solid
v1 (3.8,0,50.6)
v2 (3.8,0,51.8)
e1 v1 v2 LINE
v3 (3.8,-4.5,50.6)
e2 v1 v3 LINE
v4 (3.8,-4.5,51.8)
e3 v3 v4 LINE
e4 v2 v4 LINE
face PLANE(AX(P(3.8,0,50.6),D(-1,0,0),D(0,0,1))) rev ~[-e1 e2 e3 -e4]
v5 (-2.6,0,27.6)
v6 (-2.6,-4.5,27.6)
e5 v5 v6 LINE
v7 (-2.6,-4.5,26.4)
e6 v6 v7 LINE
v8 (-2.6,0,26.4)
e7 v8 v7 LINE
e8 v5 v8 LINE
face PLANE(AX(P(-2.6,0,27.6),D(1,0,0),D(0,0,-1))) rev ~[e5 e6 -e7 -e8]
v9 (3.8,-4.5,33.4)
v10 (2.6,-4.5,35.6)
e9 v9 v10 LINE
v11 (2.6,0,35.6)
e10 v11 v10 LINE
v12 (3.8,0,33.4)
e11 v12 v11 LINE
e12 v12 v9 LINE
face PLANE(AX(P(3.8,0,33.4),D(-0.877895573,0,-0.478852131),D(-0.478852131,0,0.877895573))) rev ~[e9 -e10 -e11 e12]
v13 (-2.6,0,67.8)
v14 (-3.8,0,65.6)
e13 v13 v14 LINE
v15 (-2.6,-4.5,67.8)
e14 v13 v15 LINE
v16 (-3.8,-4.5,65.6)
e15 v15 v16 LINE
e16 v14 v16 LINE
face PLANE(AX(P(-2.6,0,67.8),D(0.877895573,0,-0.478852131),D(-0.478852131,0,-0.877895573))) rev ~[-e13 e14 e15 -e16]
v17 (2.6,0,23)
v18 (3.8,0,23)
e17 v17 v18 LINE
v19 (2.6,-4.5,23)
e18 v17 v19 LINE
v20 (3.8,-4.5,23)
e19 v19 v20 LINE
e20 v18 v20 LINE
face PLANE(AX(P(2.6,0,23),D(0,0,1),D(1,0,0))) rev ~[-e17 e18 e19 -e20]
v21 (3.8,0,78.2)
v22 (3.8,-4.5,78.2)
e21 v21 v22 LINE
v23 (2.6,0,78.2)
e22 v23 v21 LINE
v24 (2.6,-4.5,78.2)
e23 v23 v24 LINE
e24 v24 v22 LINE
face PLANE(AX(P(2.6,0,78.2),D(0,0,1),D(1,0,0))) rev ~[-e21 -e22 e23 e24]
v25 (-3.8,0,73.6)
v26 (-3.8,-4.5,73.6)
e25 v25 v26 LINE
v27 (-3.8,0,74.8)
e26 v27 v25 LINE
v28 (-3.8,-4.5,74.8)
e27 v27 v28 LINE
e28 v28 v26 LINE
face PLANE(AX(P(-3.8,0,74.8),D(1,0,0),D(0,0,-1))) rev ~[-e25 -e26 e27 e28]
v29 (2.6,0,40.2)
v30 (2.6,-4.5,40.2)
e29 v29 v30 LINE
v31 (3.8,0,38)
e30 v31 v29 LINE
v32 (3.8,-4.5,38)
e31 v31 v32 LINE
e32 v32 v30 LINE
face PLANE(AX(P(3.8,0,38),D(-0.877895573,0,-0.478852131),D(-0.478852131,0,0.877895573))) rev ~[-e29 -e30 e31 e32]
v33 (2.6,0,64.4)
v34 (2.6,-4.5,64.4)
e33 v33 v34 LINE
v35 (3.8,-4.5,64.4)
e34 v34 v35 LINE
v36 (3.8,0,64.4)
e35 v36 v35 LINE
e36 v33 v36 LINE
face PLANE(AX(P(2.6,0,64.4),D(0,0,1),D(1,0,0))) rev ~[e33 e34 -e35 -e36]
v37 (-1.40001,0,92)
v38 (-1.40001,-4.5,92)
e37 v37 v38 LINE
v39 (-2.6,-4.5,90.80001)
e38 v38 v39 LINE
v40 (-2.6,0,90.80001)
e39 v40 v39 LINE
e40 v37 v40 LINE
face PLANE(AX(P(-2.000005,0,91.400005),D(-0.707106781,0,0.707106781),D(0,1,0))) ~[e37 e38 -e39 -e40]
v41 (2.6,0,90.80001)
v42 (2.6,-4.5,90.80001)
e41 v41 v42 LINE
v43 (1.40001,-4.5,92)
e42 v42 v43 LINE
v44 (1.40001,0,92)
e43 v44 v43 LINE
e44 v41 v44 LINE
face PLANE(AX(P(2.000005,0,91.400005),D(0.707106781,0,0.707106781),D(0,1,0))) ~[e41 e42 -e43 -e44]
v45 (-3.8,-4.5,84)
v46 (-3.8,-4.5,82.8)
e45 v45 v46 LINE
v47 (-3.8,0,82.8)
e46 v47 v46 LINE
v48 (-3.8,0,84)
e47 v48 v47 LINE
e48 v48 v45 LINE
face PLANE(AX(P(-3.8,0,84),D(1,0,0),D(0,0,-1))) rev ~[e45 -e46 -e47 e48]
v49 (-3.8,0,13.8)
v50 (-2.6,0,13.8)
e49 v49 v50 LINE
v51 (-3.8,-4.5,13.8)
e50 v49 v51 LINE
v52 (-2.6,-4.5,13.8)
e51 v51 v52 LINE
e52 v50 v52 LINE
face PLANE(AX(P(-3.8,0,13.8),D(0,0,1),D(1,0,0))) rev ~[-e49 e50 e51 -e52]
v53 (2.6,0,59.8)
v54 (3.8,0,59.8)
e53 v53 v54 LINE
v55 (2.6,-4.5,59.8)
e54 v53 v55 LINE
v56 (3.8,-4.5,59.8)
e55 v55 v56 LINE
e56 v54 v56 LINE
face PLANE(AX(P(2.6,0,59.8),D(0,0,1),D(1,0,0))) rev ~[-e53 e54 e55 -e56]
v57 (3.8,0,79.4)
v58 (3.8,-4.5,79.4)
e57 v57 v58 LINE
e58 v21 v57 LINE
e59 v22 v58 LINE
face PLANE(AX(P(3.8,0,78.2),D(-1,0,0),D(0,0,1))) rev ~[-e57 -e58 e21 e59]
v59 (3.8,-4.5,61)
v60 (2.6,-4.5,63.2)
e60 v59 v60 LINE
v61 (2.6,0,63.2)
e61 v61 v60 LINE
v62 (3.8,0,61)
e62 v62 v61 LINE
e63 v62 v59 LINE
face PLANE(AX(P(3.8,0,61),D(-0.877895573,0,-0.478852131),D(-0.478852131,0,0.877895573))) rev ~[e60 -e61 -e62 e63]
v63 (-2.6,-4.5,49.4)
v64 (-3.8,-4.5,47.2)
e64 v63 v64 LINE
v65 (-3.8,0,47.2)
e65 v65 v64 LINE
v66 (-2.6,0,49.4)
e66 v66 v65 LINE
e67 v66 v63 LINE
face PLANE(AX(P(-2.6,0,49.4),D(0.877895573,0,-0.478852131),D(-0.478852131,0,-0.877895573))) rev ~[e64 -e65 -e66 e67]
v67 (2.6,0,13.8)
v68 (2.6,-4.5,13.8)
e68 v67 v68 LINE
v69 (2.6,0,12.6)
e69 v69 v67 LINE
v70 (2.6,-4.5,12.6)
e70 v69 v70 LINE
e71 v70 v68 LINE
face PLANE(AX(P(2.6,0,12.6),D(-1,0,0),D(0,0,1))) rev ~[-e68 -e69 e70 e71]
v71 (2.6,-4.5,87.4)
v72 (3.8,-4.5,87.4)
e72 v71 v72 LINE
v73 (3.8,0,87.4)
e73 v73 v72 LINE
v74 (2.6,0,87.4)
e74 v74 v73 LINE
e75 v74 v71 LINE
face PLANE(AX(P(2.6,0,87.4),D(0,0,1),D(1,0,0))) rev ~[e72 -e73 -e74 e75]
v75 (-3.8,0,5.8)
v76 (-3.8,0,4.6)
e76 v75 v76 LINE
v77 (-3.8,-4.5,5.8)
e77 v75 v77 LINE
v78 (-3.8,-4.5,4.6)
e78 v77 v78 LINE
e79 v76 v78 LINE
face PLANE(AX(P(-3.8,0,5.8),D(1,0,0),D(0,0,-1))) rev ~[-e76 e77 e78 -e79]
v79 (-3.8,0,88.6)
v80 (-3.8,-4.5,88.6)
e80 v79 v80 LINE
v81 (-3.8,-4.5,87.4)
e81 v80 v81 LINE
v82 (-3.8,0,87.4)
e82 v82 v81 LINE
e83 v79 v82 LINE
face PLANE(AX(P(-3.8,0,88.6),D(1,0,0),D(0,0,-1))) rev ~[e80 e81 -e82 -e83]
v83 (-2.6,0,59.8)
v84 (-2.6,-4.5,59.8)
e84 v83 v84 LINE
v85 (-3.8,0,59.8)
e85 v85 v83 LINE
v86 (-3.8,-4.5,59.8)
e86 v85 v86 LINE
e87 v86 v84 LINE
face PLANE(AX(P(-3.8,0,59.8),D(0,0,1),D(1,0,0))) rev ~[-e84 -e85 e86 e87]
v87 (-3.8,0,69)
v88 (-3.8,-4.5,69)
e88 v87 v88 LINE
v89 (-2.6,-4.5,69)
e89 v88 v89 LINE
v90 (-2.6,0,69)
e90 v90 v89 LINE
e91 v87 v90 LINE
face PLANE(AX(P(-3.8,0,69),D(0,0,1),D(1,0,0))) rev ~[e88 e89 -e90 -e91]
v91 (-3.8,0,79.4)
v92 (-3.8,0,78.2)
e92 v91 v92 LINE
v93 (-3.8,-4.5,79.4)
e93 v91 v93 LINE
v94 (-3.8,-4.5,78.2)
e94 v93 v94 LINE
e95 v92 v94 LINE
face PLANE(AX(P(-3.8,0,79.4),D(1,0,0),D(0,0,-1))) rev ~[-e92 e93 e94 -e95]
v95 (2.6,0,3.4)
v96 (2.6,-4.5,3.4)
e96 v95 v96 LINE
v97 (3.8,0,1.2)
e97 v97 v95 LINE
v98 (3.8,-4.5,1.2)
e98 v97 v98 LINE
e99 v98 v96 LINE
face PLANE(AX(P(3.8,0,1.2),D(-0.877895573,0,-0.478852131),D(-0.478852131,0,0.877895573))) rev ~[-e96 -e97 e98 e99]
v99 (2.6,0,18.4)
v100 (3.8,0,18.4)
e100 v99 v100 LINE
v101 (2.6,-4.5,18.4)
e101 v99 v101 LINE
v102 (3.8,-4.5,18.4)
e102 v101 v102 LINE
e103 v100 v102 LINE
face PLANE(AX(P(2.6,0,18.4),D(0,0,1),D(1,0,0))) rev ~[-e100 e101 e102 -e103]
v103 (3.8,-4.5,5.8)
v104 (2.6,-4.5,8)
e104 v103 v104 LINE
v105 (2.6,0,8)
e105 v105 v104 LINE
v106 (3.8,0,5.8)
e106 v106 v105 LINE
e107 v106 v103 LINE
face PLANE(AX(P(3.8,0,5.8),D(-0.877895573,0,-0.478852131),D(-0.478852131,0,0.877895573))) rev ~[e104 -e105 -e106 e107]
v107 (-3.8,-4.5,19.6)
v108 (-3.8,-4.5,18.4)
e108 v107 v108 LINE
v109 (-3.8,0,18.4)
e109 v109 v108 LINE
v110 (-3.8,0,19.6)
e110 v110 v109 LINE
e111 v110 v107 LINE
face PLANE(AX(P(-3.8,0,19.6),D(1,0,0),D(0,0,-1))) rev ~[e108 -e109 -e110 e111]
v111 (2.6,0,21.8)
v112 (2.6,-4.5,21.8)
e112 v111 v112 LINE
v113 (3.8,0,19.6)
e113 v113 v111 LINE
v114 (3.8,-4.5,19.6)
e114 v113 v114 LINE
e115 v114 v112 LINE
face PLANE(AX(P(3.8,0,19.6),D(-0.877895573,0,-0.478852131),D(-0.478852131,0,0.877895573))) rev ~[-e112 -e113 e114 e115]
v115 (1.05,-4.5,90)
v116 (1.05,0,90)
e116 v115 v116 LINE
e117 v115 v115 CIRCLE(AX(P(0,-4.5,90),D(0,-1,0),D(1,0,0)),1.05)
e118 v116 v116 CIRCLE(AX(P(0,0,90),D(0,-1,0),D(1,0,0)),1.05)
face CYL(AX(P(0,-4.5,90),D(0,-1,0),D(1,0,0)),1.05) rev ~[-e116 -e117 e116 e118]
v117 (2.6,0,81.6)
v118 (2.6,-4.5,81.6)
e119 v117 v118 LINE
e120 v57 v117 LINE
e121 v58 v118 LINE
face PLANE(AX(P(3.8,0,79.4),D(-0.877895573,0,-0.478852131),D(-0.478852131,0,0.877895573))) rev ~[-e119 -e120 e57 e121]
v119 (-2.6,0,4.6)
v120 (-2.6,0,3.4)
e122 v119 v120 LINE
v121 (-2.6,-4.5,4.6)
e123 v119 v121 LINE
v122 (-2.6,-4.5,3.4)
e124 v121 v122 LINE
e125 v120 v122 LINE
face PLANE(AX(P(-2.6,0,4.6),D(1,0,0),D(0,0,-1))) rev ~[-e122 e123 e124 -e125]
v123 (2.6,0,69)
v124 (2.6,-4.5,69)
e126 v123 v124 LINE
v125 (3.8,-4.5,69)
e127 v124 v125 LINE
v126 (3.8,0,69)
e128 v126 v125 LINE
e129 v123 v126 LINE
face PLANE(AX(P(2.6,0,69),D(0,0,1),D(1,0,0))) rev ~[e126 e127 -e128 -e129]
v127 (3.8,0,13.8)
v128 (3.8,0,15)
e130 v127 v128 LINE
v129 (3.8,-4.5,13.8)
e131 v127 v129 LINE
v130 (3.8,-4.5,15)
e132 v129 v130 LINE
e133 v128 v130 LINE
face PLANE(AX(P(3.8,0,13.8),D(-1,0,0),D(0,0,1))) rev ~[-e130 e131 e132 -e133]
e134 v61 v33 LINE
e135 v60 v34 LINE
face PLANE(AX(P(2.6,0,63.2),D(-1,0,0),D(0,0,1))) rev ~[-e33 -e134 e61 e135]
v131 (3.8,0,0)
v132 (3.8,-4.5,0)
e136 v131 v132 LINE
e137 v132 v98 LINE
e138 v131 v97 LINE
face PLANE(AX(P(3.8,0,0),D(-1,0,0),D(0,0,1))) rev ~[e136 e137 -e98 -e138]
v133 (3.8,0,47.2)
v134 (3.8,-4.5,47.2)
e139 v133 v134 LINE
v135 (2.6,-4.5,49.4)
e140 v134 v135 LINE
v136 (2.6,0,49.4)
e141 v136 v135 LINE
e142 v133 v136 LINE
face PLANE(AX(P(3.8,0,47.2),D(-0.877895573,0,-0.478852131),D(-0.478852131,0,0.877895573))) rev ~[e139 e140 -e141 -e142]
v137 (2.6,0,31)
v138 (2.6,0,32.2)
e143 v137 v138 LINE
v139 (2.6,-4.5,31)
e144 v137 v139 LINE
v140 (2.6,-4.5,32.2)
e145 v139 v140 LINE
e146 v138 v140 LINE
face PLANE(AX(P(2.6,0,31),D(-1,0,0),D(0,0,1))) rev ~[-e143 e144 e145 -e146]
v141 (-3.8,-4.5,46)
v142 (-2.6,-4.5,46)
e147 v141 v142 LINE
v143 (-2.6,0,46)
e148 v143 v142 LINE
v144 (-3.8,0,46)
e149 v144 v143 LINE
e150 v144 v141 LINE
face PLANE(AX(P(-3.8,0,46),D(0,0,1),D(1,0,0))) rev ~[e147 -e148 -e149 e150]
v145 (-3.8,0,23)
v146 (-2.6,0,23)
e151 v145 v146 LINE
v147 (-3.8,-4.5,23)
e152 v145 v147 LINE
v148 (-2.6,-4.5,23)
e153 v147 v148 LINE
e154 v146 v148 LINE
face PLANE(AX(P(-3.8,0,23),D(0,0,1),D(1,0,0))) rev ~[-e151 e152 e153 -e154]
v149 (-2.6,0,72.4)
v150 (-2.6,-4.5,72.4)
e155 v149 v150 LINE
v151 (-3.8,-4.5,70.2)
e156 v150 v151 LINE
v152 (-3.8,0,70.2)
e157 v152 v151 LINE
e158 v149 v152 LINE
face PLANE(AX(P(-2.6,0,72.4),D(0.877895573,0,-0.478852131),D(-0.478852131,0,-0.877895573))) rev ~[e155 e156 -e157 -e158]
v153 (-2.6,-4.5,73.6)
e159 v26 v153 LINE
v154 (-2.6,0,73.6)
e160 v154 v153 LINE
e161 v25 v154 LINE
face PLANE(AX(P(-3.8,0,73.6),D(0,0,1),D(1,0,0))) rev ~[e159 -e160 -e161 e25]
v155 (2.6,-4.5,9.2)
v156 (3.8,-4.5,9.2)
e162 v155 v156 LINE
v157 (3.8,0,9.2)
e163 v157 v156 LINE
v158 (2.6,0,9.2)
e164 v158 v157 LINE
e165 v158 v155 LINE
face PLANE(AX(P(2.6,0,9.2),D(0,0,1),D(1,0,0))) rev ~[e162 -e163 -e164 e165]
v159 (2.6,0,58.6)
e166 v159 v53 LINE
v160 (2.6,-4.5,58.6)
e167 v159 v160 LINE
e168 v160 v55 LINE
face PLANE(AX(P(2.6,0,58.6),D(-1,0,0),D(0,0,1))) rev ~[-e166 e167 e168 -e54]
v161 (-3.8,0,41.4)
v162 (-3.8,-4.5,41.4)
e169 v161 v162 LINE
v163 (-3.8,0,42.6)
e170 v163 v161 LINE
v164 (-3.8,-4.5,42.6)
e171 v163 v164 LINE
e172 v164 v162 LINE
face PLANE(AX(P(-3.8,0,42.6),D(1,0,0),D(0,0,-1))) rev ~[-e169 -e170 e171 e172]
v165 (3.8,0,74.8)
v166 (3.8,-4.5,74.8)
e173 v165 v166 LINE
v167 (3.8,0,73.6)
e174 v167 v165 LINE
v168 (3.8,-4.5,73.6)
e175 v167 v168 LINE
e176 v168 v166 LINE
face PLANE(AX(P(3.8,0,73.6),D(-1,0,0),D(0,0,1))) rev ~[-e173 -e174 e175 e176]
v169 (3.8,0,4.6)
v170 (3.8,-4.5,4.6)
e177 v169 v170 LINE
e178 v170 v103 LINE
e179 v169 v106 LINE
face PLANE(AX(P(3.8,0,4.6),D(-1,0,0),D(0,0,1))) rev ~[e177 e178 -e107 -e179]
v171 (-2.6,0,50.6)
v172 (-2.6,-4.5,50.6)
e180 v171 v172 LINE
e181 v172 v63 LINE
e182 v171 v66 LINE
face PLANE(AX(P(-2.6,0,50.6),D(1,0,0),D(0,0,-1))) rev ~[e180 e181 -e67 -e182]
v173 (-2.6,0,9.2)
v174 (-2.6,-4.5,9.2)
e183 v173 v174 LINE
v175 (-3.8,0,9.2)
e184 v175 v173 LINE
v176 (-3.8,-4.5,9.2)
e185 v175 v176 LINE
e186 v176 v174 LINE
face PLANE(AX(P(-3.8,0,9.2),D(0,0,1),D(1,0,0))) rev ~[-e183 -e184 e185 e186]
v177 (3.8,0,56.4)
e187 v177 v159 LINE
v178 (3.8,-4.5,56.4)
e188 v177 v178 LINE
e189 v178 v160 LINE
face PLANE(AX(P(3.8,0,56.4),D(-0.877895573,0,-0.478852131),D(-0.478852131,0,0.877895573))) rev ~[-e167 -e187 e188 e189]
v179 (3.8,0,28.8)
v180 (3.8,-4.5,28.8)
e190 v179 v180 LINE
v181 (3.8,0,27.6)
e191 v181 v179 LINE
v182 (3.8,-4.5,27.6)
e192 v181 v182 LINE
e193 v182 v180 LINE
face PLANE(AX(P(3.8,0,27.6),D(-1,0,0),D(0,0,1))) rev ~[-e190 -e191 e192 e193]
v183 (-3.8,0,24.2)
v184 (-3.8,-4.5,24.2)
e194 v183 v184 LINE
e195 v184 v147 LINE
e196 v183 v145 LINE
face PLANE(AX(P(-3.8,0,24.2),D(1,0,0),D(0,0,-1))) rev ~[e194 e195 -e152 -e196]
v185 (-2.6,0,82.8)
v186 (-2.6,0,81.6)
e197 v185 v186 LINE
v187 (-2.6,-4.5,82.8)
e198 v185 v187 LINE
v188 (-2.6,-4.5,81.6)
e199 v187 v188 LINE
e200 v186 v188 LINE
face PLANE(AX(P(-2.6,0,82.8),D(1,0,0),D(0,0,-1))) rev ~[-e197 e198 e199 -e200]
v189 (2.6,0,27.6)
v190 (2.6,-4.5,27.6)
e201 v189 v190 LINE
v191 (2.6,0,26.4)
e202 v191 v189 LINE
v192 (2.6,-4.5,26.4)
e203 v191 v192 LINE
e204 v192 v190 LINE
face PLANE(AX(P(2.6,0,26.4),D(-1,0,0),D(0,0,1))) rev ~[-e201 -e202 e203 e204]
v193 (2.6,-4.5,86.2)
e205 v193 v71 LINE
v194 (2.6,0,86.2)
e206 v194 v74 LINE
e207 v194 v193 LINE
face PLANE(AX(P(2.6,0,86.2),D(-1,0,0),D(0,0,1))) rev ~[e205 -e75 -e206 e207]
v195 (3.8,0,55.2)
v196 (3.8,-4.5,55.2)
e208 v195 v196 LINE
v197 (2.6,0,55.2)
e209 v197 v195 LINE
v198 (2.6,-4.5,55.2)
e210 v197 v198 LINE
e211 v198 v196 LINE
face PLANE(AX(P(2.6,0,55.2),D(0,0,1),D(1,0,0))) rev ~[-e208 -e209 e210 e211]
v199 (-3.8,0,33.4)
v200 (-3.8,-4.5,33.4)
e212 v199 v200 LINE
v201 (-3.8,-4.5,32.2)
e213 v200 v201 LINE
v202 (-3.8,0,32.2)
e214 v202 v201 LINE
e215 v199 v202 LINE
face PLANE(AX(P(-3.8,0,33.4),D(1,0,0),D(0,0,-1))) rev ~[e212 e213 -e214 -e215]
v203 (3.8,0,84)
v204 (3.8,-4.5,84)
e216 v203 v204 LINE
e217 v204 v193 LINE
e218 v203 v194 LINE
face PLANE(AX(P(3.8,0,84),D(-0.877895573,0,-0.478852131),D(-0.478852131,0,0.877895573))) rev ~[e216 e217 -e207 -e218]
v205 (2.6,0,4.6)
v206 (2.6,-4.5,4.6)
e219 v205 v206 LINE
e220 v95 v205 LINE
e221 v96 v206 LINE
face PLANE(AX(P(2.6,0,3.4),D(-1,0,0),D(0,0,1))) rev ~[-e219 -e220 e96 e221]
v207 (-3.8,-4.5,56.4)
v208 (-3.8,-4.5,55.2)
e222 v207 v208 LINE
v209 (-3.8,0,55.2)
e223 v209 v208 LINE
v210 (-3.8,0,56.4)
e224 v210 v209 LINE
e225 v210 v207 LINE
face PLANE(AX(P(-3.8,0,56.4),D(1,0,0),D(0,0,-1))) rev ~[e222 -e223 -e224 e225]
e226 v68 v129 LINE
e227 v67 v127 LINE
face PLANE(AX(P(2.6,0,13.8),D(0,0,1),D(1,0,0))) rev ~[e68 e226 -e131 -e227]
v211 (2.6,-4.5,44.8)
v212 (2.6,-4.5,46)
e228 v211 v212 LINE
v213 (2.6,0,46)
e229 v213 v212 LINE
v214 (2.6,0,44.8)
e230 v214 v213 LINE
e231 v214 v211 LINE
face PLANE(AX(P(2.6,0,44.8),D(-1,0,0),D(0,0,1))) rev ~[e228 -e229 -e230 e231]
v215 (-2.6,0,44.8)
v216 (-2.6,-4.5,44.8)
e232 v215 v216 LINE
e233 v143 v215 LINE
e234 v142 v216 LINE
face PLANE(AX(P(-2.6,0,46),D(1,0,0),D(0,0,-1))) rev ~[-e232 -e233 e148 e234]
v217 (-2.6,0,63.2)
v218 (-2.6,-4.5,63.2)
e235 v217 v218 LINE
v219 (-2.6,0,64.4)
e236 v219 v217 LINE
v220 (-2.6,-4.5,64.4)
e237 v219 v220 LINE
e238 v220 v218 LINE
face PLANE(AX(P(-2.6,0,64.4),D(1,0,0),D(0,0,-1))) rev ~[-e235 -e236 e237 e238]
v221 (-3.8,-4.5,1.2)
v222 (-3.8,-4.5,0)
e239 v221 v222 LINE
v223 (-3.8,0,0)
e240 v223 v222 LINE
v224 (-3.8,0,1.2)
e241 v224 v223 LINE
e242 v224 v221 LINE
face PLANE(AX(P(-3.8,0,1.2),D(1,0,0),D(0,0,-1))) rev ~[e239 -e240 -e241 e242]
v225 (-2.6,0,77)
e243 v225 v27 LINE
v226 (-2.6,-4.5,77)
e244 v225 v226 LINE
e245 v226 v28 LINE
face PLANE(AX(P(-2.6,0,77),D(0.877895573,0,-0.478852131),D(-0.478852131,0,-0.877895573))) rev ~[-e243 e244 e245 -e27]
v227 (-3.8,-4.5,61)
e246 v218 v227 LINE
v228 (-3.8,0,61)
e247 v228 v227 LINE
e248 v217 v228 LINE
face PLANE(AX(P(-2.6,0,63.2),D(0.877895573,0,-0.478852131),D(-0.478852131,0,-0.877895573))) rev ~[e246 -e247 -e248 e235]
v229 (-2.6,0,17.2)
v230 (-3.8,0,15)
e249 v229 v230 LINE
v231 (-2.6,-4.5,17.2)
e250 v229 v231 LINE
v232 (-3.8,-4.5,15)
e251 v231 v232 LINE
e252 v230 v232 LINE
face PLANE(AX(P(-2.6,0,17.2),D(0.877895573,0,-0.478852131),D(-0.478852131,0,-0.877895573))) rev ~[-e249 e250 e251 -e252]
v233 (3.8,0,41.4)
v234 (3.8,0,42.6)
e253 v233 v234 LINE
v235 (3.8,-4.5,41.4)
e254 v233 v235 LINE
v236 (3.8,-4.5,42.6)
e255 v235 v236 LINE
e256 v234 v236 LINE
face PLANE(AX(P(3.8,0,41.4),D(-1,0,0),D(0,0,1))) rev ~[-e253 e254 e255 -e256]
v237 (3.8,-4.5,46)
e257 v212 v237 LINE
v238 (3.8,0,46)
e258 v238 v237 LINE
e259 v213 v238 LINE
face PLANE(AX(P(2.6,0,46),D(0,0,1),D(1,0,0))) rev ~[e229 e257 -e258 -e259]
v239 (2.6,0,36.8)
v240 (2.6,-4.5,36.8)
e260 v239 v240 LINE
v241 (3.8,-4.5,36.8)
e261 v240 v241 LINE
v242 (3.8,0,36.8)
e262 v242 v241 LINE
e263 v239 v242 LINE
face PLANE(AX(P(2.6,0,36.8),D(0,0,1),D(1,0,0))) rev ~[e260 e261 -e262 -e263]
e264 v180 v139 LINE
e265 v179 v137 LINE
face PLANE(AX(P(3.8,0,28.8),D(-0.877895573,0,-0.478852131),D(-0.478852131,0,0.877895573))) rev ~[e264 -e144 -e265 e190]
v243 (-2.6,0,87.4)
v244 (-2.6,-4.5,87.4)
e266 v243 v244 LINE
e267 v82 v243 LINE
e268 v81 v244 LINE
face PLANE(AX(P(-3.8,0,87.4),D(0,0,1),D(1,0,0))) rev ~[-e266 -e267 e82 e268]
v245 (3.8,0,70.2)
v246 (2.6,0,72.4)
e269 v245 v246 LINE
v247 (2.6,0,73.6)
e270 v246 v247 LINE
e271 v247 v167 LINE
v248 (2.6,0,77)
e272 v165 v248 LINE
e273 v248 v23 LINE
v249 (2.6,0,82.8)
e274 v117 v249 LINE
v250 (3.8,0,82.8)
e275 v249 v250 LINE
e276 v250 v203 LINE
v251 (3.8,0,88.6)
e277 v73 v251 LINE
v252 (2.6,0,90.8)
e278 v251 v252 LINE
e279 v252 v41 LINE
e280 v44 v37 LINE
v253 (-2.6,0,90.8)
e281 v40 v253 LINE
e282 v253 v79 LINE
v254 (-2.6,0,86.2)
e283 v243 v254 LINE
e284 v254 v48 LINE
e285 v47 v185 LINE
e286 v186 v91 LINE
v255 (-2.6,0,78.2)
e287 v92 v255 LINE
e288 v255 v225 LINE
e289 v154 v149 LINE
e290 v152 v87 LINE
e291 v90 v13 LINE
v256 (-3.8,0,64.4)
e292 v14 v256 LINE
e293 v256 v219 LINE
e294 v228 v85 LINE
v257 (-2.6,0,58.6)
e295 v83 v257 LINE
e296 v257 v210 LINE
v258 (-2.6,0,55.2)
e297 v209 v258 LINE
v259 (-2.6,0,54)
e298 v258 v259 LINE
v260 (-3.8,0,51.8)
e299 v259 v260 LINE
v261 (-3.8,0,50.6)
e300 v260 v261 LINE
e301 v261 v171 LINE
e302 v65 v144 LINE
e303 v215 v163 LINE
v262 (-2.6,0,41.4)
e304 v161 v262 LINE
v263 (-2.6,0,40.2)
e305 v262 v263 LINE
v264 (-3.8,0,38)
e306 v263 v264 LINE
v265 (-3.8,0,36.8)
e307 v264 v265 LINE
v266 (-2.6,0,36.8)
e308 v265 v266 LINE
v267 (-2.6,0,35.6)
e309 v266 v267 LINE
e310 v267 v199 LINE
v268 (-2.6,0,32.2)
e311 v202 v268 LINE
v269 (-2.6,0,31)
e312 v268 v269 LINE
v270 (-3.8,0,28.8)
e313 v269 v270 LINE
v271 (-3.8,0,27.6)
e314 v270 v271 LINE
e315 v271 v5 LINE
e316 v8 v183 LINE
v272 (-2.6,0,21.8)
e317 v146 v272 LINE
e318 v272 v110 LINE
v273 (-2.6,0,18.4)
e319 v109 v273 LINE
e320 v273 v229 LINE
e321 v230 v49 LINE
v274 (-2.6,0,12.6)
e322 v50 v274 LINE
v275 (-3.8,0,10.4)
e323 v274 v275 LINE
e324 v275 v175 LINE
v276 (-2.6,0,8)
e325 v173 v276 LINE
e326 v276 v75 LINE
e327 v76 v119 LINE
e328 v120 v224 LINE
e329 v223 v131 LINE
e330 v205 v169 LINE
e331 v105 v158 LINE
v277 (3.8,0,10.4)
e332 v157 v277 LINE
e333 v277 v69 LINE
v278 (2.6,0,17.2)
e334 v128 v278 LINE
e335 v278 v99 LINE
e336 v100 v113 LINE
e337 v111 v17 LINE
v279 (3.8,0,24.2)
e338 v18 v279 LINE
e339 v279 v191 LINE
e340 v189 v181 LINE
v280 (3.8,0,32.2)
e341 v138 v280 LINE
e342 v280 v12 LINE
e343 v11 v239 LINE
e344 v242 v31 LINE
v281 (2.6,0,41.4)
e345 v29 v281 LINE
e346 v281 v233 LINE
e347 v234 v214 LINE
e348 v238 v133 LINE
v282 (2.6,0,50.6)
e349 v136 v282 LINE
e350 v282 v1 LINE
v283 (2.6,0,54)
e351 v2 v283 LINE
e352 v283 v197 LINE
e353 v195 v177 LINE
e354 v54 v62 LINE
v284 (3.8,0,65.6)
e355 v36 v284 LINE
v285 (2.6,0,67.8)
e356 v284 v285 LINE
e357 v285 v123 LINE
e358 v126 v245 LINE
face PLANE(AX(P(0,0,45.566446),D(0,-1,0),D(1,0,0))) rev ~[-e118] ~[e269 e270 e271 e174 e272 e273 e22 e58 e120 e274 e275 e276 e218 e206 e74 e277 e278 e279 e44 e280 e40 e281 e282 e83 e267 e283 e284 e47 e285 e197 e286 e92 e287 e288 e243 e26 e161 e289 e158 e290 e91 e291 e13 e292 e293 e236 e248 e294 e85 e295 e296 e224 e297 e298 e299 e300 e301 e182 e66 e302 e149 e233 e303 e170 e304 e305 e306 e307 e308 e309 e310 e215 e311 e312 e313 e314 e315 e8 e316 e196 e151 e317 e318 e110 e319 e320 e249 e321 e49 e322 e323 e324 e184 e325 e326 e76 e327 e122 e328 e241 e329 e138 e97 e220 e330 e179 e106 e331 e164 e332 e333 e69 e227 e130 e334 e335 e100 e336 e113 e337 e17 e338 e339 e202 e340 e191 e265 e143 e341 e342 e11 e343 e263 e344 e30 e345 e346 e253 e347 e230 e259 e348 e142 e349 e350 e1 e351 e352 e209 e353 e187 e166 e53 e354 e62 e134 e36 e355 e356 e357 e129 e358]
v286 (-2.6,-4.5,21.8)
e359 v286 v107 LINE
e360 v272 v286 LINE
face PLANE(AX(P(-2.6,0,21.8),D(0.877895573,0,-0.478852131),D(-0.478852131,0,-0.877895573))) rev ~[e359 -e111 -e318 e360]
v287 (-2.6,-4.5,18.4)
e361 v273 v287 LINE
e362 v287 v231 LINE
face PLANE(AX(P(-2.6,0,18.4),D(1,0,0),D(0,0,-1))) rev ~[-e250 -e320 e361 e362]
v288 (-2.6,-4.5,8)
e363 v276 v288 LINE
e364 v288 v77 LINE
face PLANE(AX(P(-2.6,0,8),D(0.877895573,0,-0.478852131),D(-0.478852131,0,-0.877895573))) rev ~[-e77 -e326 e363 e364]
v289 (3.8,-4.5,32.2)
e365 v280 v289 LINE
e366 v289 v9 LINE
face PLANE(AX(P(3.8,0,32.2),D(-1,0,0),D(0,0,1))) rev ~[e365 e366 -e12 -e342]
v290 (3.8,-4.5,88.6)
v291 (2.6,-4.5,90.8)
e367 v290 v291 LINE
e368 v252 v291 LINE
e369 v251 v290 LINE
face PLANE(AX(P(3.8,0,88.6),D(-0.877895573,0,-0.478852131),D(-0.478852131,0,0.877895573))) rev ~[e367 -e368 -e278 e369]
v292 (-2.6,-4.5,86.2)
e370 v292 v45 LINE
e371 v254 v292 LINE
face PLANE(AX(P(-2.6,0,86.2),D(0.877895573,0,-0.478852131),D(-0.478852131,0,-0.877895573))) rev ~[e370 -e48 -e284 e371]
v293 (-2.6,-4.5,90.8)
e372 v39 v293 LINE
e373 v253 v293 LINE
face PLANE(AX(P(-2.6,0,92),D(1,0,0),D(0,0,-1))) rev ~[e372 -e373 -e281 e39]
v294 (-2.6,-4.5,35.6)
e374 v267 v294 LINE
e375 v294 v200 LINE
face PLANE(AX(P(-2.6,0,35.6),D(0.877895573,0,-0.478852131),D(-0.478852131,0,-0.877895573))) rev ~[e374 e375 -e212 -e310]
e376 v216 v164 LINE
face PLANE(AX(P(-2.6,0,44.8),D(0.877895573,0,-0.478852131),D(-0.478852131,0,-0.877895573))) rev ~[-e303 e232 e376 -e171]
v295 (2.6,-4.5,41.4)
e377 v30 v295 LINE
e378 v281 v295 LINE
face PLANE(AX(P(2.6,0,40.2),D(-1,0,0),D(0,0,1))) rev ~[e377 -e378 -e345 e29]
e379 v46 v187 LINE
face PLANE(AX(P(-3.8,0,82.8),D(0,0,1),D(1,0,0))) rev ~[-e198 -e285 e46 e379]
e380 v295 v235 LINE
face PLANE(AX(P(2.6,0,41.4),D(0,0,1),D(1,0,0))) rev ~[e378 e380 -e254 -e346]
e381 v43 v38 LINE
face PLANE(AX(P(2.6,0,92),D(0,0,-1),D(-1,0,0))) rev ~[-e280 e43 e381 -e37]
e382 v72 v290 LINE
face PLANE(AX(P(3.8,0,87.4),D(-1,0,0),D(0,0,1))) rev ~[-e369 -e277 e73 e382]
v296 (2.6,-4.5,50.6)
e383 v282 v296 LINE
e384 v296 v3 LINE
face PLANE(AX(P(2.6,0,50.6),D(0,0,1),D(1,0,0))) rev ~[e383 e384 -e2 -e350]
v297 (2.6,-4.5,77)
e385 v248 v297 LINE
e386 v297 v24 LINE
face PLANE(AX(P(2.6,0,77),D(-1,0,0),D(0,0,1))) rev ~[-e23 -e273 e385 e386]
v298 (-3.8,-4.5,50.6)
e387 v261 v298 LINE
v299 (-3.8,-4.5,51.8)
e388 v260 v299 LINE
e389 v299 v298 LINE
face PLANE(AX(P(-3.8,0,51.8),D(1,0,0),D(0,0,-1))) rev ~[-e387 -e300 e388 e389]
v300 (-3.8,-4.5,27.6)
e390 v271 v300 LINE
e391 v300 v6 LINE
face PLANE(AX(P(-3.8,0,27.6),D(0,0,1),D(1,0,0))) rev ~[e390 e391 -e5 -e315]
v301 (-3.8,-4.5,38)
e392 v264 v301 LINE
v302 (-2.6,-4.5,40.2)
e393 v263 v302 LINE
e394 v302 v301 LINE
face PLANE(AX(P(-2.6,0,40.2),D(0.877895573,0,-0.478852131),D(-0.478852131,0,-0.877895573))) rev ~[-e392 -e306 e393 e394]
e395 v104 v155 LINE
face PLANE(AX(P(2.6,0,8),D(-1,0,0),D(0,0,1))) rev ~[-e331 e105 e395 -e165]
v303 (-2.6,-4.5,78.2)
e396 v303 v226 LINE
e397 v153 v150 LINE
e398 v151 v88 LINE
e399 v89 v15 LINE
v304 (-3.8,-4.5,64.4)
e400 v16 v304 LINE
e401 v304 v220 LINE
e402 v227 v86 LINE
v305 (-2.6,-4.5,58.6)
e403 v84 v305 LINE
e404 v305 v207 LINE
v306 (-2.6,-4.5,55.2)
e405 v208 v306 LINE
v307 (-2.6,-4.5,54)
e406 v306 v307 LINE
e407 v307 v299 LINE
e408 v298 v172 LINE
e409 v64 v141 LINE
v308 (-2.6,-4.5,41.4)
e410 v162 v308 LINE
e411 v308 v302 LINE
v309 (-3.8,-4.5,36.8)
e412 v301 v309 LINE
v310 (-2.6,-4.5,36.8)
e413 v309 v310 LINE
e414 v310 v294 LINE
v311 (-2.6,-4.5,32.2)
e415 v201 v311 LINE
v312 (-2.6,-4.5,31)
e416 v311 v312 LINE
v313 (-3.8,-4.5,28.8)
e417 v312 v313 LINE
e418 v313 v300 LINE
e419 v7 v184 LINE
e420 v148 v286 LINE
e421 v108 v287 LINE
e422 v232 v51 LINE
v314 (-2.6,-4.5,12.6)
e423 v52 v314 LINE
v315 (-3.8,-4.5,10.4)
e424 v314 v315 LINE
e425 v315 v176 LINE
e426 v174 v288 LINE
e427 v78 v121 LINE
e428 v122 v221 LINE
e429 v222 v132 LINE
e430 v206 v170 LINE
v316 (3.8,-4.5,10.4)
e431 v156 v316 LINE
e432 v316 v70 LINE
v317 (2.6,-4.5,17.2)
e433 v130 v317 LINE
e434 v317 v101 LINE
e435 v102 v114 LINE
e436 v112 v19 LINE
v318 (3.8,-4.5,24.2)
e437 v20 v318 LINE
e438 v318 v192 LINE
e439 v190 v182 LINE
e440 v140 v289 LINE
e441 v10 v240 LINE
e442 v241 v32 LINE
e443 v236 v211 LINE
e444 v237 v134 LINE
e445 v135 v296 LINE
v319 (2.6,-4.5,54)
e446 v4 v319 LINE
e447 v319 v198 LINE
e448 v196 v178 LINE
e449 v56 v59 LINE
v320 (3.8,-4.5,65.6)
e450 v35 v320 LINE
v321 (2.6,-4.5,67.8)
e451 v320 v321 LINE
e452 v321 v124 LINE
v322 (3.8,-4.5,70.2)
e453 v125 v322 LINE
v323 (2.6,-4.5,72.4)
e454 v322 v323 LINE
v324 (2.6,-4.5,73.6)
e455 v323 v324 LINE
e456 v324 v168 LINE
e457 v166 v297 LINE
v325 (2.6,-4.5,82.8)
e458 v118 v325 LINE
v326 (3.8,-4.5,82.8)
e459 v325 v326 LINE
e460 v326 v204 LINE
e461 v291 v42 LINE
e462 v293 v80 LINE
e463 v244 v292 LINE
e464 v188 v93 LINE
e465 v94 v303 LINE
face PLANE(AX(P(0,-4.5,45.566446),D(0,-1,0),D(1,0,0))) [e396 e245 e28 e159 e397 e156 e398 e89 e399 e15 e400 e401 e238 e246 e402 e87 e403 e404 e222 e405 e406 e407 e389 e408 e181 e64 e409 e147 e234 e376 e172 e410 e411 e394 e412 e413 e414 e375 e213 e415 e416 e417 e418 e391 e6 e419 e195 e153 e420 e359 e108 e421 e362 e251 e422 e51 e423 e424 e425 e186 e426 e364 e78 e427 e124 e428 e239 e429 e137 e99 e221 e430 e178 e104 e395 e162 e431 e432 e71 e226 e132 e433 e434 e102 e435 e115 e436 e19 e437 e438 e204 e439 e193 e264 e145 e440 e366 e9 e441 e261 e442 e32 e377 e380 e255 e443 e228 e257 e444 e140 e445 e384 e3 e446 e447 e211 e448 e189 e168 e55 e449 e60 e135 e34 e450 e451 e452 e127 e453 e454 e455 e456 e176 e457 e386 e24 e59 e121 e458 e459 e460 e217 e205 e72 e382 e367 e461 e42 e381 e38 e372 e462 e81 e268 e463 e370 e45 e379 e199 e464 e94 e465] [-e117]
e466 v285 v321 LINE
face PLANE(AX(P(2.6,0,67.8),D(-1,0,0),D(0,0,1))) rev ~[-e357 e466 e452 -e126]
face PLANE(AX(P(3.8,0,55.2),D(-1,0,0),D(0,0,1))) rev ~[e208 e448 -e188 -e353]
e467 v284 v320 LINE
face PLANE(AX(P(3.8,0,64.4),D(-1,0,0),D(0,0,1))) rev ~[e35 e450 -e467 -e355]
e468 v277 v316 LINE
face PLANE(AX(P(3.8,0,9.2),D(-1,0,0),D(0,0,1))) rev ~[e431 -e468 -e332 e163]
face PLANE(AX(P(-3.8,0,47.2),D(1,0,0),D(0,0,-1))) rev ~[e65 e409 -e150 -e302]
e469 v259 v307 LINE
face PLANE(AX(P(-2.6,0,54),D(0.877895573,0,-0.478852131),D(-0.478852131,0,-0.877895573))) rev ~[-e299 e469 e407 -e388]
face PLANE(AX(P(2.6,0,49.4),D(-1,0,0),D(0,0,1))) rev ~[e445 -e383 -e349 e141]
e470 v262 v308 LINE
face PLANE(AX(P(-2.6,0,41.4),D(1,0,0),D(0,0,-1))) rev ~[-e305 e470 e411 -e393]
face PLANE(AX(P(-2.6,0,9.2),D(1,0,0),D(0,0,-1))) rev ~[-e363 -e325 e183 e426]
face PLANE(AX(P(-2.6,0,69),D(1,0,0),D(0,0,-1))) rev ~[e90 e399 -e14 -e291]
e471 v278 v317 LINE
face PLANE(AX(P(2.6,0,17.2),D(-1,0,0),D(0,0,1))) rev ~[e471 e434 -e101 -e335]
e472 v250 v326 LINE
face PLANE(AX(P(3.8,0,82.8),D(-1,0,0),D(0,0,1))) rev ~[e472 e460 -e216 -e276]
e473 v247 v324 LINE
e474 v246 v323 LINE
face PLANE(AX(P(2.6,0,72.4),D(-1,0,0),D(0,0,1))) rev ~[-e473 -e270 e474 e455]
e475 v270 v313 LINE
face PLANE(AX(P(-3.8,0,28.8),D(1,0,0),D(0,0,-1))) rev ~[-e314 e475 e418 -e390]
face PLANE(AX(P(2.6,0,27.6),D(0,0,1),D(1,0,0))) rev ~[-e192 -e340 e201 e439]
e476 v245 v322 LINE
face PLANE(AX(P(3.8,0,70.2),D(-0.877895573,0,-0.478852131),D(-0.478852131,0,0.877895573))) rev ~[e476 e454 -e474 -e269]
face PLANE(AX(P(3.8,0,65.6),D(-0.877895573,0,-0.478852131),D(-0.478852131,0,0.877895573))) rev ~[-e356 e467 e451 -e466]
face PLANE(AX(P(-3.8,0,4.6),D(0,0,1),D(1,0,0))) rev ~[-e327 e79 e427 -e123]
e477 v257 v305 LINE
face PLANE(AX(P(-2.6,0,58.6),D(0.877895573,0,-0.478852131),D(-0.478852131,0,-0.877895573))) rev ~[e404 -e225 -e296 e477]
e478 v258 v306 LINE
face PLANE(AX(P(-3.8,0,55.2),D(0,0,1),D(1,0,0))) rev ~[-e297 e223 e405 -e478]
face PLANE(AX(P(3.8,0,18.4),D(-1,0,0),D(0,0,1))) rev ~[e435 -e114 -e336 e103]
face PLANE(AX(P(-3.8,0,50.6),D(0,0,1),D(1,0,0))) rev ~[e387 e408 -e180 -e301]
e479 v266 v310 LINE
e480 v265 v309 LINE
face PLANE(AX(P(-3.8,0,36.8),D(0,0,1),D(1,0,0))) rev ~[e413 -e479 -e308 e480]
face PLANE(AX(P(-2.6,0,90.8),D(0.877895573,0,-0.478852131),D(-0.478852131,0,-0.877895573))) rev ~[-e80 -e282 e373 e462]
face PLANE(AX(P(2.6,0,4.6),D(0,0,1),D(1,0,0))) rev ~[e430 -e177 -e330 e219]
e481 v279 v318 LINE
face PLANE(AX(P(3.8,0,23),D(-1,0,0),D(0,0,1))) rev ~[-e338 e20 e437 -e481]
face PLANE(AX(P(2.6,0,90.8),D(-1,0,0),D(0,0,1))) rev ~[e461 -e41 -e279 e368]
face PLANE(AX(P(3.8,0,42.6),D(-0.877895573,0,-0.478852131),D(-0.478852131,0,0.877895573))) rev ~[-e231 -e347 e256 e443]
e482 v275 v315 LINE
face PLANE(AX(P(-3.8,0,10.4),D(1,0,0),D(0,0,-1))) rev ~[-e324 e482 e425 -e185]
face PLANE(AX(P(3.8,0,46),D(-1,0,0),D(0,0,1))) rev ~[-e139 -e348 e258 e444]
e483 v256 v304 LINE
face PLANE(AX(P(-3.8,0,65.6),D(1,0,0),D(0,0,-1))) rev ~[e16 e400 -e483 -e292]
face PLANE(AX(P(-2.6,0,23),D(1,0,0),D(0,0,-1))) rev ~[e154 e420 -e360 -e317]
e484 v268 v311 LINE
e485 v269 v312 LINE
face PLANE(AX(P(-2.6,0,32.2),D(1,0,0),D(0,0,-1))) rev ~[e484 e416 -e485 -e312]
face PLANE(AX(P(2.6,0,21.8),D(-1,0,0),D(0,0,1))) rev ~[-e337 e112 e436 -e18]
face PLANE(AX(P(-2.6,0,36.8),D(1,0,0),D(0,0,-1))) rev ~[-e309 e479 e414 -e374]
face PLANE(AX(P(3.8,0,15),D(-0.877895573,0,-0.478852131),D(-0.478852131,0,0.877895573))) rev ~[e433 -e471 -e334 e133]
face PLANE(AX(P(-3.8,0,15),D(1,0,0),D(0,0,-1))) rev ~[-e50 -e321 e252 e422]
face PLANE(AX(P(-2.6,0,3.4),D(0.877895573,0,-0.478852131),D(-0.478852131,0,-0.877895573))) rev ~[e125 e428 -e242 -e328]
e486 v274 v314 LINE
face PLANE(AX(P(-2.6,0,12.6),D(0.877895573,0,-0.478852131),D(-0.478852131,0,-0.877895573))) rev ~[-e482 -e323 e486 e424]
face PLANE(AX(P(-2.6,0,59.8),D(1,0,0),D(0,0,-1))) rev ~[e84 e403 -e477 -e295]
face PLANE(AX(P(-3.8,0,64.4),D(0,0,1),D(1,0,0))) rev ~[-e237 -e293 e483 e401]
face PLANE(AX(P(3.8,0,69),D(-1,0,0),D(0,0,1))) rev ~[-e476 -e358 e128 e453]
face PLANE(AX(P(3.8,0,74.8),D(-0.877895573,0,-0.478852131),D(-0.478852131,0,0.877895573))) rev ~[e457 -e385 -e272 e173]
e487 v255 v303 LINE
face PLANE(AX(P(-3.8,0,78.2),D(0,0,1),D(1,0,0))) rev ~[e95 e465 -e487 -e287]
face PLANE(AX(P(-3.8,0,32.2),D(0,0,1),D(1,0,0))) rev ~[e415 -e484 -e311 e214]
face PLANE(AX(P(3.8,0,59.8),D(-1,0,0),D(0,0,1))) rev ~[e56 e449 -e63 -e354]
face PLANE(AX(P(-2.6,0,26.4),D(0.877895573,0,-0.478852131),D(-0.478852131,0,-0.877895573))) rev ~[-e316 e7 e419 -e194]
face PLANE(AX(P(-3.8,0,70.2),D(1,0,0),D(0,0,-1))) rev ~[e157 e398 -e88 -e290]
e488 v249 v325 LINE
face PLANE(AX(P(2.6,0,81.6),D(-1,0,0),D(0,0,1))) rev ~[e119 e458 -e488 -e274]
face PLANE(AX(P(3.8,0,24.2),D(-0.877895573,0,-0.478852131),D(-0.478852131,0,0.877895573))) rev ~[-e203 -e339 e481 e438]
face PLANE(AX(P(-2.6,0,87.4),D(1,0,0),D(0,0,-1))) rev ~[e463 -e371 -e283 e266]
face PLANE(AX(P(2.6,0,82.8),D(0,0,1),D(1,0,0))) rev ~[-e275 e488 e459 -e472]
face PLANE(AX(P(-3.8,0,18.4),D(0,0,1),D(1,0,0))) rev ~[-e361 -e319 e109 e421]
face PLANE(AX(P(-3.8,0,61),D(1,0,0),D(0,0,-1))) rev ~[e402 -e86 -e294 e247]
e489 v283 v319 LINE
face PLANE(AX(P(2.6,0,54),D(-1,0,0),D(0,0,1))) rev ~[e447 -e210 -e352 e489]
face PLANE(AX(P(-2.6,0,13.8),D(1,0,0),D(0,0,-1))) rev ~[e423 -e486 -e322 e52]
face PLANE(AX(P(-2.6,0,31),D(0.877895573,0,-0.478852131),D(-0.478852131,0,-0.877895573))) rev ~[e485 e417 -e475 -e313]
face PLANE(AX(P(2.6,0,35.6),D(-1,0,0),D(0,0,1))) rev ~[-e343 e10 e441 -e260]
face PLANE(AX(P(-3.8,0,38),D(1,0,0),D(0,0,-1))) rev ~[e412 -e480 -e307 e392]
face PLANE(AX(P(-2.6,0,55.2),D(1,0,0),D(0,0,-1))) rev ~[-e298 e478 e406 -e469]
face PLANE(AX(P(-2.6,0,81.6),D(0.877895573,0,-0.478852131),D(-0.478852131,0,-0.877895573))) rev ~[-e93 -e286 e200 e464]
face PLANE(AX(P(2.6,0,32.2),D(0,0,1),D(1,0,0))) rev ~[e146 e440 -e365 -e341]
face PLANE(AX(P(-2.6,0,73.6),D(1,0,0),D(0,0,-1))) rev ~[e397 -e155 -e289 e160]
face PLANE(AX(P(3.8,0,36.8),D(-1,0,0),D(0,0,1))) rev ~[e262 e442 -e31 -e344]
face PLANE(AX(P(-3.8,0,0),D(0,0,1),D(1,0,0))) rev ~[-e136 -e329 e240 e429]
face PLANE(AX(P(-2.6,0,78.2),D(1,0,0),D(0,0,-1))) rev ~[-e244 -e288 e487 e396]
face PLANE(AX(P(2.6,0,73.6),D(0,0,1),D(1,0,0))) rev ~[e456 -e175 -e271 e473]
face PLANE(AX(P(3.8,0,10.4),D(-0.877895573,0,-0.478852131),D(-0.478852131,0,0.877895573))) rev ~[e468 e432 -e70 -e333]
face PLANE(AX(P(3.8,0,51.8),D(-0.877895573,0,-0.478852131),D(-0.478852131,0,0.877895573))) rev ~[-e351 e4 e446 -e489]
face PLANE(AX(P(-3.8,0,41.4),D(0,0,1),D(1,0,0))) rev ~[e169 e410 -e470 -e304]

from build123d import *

# Parameters (mm, degrees)
F1_DEPTH = 4.5
F2_SIZE  = 1.19999
F3_R     = 1.05
F4_DEPTH = 25


# Not quite as in the source:
# - a fillet or chamfer is up to 0.001 mm smaller than in the source, because OpenCascade refuses the exact size


with BuildPart() as f1:
    # F0 (on Front) → F1 (new body)
    with BuildSketch(Plane.XZ):
        Polygon((-3.8, 1.2), (-3.8, 0), (-2.6, 0), (2.6, 0), (3.8, 0), (3.8, 1.2), (2.6, 3.4), (2.6, 4.6), (3.8, 4.6), (3.8, 5.8), (2.6, 8), (2.6, 9.2), (3.8, 9.2), (3.8, 10.4), (2.6, 12.6), (2.6, 13.8), (3.8, 13.8), (3.8, 15), (2.6, 17.2), (2.6, 18.4), (3.8, 18.4), (3.8, 19.6), (2.6, 21.8), (2.6, 23), (3.8, 23), (3.8, 24.2), (2.6, 26.4), (2.6, 27.6), (3.8, 27.6), (3.8, 28.8), (2.6, 31), (2.6, 32.2), (3.8, 32.2), (3.8, 33.4), (2.6, 35.6), (2.6, 36.8), (3.8, 36.8), (3.8, 38), (2.6, 40.2), (2.6, 41.4), (3.8, 41.4), (3.8, 42.6), (2.6, 44.8), (2.6, 46), (3.8, 46), (3.8, 47.2), (2.6, 49.4), (2.6, 50.6), (3.8, 50.6), (3.8, 51.8), (2.6, 54), (2.6, 55.2), (3.8, 55.2), (3.8, 56.4), (2.6, 58.6), (2.6, 59.8), (3.8, 59.8), (3.8, 61), (2.6, 63.2), (2.6, 64.4), (3.8, 64.4), (3.8, 65.6), (2.6, 67.8), (2.6, 69), (3.8, 69), (3.8, 70.2), (2.6, 72.4), (2.6, 73.6), (3.8, 73.6), (3.8, 74.8), (2.6, 77), (2.6, 78.2), (3.8, 78.2), (3.8, 79.4), (2.6, 81.6), (2.6, 82.8), (3.8, 82.8), (3.8, 84), (2.6, 86.2), (2.6, 87.4), (3.8, 87.4), (3.8, 88.6), (2.6, 90.8), (2.6, 92), (-2.6, 92), (-2.6, 90.8), (-3.8, 88.6), (-3.8, 87.4), (-2.6, 87.4), (-2.6, 86.2), (-3.8, 84), (-3.8, 82.8), (-2.6, 82.8), (-2.6, 81.6), (-3.8, 79.4), (-3.8, 78.2), (-2.6, 78.2), (-2.6, 77), (-3.8, 74.8), (-3.8, 73.6), (-2.6, 73.6), (-2.6, 72.4), (-3.8, 70.2), (-3.8, 69), (-2.6, 69), (-2.6, 67.8), (-3.8, 65.6), (-3.8, 64.4), (-2.6, 64.4), (-2.6, 63.2), (-3.8, 61), (-3.8, 59.8), (-2.6, 59.8), (-2.6, 58.6), (-3.8, 56.4), (-3.8, 55.2), (-2.6, 55.2), (-2.6, 54), (-3.8, 51.8), (-3.8, 50.6), (-2.6, 50.6), (-2.6, 49.4), (-3.8, 47.2), (-3.8, 46), (-2.6, 46), (-2.6, 44.8), (-3.8, 42.6), (-3.8, 41.4), (-2.6, 41.4), (-2.6, 40.2), (-3.8, 38), (-3.8, 36.8), (-2.6, 36.8), (-2.6, 35.6), (-3.8, 33.4), (-3.8, 32.2), (-2.6, 32.2), (-2.6, 31), (-3.8, 28.8), (-3.8, 27.6), (-2.6, 27.6), (-2.6, 26.4), (-3.8, 24.2), (-3.8, 23), (-2.6, 23), (-2.6, 21.8), (-3.8, 19.6), (-3.8, 18.4), (-2.6, 18.4), (-2.6, 17.2), (-3.8, 15), (-3.8, 13.8), (-2.6, 13.8), (-2.6, 12.6), (-3.8, 10.4), (-3.8, 9.2), (-2.6, 9.2), (-2.6, 8), (-3.8, 5.8), (-3.8, 4.6), (-2.6, 4.6), (-2.6, 3.4), align=None)
    extrude(amount=F1_DEPTH)

    # F2 (size 1.2 in the source; OpenCascade refuses exactly that, so slightly less here)
    f2_edges = [f1.edges().sort_by_distance(p)[0] for p in [
        (2.6, -2.25, 92),
        (-2.6, -2.25, 92),
    ]]
    chamfer(f2_edges, length=F2_SIZE)

    # F3 (on face) → F4 (cut)
    with BuildSketch(Plane.XZ.offset(4.5)):
        with Locations((0, 90)):
            Circle(F3_R)
    extrude(amount=-F4_DEPTH, mode=Mode.SUBTRACT)


solid = f1.part
